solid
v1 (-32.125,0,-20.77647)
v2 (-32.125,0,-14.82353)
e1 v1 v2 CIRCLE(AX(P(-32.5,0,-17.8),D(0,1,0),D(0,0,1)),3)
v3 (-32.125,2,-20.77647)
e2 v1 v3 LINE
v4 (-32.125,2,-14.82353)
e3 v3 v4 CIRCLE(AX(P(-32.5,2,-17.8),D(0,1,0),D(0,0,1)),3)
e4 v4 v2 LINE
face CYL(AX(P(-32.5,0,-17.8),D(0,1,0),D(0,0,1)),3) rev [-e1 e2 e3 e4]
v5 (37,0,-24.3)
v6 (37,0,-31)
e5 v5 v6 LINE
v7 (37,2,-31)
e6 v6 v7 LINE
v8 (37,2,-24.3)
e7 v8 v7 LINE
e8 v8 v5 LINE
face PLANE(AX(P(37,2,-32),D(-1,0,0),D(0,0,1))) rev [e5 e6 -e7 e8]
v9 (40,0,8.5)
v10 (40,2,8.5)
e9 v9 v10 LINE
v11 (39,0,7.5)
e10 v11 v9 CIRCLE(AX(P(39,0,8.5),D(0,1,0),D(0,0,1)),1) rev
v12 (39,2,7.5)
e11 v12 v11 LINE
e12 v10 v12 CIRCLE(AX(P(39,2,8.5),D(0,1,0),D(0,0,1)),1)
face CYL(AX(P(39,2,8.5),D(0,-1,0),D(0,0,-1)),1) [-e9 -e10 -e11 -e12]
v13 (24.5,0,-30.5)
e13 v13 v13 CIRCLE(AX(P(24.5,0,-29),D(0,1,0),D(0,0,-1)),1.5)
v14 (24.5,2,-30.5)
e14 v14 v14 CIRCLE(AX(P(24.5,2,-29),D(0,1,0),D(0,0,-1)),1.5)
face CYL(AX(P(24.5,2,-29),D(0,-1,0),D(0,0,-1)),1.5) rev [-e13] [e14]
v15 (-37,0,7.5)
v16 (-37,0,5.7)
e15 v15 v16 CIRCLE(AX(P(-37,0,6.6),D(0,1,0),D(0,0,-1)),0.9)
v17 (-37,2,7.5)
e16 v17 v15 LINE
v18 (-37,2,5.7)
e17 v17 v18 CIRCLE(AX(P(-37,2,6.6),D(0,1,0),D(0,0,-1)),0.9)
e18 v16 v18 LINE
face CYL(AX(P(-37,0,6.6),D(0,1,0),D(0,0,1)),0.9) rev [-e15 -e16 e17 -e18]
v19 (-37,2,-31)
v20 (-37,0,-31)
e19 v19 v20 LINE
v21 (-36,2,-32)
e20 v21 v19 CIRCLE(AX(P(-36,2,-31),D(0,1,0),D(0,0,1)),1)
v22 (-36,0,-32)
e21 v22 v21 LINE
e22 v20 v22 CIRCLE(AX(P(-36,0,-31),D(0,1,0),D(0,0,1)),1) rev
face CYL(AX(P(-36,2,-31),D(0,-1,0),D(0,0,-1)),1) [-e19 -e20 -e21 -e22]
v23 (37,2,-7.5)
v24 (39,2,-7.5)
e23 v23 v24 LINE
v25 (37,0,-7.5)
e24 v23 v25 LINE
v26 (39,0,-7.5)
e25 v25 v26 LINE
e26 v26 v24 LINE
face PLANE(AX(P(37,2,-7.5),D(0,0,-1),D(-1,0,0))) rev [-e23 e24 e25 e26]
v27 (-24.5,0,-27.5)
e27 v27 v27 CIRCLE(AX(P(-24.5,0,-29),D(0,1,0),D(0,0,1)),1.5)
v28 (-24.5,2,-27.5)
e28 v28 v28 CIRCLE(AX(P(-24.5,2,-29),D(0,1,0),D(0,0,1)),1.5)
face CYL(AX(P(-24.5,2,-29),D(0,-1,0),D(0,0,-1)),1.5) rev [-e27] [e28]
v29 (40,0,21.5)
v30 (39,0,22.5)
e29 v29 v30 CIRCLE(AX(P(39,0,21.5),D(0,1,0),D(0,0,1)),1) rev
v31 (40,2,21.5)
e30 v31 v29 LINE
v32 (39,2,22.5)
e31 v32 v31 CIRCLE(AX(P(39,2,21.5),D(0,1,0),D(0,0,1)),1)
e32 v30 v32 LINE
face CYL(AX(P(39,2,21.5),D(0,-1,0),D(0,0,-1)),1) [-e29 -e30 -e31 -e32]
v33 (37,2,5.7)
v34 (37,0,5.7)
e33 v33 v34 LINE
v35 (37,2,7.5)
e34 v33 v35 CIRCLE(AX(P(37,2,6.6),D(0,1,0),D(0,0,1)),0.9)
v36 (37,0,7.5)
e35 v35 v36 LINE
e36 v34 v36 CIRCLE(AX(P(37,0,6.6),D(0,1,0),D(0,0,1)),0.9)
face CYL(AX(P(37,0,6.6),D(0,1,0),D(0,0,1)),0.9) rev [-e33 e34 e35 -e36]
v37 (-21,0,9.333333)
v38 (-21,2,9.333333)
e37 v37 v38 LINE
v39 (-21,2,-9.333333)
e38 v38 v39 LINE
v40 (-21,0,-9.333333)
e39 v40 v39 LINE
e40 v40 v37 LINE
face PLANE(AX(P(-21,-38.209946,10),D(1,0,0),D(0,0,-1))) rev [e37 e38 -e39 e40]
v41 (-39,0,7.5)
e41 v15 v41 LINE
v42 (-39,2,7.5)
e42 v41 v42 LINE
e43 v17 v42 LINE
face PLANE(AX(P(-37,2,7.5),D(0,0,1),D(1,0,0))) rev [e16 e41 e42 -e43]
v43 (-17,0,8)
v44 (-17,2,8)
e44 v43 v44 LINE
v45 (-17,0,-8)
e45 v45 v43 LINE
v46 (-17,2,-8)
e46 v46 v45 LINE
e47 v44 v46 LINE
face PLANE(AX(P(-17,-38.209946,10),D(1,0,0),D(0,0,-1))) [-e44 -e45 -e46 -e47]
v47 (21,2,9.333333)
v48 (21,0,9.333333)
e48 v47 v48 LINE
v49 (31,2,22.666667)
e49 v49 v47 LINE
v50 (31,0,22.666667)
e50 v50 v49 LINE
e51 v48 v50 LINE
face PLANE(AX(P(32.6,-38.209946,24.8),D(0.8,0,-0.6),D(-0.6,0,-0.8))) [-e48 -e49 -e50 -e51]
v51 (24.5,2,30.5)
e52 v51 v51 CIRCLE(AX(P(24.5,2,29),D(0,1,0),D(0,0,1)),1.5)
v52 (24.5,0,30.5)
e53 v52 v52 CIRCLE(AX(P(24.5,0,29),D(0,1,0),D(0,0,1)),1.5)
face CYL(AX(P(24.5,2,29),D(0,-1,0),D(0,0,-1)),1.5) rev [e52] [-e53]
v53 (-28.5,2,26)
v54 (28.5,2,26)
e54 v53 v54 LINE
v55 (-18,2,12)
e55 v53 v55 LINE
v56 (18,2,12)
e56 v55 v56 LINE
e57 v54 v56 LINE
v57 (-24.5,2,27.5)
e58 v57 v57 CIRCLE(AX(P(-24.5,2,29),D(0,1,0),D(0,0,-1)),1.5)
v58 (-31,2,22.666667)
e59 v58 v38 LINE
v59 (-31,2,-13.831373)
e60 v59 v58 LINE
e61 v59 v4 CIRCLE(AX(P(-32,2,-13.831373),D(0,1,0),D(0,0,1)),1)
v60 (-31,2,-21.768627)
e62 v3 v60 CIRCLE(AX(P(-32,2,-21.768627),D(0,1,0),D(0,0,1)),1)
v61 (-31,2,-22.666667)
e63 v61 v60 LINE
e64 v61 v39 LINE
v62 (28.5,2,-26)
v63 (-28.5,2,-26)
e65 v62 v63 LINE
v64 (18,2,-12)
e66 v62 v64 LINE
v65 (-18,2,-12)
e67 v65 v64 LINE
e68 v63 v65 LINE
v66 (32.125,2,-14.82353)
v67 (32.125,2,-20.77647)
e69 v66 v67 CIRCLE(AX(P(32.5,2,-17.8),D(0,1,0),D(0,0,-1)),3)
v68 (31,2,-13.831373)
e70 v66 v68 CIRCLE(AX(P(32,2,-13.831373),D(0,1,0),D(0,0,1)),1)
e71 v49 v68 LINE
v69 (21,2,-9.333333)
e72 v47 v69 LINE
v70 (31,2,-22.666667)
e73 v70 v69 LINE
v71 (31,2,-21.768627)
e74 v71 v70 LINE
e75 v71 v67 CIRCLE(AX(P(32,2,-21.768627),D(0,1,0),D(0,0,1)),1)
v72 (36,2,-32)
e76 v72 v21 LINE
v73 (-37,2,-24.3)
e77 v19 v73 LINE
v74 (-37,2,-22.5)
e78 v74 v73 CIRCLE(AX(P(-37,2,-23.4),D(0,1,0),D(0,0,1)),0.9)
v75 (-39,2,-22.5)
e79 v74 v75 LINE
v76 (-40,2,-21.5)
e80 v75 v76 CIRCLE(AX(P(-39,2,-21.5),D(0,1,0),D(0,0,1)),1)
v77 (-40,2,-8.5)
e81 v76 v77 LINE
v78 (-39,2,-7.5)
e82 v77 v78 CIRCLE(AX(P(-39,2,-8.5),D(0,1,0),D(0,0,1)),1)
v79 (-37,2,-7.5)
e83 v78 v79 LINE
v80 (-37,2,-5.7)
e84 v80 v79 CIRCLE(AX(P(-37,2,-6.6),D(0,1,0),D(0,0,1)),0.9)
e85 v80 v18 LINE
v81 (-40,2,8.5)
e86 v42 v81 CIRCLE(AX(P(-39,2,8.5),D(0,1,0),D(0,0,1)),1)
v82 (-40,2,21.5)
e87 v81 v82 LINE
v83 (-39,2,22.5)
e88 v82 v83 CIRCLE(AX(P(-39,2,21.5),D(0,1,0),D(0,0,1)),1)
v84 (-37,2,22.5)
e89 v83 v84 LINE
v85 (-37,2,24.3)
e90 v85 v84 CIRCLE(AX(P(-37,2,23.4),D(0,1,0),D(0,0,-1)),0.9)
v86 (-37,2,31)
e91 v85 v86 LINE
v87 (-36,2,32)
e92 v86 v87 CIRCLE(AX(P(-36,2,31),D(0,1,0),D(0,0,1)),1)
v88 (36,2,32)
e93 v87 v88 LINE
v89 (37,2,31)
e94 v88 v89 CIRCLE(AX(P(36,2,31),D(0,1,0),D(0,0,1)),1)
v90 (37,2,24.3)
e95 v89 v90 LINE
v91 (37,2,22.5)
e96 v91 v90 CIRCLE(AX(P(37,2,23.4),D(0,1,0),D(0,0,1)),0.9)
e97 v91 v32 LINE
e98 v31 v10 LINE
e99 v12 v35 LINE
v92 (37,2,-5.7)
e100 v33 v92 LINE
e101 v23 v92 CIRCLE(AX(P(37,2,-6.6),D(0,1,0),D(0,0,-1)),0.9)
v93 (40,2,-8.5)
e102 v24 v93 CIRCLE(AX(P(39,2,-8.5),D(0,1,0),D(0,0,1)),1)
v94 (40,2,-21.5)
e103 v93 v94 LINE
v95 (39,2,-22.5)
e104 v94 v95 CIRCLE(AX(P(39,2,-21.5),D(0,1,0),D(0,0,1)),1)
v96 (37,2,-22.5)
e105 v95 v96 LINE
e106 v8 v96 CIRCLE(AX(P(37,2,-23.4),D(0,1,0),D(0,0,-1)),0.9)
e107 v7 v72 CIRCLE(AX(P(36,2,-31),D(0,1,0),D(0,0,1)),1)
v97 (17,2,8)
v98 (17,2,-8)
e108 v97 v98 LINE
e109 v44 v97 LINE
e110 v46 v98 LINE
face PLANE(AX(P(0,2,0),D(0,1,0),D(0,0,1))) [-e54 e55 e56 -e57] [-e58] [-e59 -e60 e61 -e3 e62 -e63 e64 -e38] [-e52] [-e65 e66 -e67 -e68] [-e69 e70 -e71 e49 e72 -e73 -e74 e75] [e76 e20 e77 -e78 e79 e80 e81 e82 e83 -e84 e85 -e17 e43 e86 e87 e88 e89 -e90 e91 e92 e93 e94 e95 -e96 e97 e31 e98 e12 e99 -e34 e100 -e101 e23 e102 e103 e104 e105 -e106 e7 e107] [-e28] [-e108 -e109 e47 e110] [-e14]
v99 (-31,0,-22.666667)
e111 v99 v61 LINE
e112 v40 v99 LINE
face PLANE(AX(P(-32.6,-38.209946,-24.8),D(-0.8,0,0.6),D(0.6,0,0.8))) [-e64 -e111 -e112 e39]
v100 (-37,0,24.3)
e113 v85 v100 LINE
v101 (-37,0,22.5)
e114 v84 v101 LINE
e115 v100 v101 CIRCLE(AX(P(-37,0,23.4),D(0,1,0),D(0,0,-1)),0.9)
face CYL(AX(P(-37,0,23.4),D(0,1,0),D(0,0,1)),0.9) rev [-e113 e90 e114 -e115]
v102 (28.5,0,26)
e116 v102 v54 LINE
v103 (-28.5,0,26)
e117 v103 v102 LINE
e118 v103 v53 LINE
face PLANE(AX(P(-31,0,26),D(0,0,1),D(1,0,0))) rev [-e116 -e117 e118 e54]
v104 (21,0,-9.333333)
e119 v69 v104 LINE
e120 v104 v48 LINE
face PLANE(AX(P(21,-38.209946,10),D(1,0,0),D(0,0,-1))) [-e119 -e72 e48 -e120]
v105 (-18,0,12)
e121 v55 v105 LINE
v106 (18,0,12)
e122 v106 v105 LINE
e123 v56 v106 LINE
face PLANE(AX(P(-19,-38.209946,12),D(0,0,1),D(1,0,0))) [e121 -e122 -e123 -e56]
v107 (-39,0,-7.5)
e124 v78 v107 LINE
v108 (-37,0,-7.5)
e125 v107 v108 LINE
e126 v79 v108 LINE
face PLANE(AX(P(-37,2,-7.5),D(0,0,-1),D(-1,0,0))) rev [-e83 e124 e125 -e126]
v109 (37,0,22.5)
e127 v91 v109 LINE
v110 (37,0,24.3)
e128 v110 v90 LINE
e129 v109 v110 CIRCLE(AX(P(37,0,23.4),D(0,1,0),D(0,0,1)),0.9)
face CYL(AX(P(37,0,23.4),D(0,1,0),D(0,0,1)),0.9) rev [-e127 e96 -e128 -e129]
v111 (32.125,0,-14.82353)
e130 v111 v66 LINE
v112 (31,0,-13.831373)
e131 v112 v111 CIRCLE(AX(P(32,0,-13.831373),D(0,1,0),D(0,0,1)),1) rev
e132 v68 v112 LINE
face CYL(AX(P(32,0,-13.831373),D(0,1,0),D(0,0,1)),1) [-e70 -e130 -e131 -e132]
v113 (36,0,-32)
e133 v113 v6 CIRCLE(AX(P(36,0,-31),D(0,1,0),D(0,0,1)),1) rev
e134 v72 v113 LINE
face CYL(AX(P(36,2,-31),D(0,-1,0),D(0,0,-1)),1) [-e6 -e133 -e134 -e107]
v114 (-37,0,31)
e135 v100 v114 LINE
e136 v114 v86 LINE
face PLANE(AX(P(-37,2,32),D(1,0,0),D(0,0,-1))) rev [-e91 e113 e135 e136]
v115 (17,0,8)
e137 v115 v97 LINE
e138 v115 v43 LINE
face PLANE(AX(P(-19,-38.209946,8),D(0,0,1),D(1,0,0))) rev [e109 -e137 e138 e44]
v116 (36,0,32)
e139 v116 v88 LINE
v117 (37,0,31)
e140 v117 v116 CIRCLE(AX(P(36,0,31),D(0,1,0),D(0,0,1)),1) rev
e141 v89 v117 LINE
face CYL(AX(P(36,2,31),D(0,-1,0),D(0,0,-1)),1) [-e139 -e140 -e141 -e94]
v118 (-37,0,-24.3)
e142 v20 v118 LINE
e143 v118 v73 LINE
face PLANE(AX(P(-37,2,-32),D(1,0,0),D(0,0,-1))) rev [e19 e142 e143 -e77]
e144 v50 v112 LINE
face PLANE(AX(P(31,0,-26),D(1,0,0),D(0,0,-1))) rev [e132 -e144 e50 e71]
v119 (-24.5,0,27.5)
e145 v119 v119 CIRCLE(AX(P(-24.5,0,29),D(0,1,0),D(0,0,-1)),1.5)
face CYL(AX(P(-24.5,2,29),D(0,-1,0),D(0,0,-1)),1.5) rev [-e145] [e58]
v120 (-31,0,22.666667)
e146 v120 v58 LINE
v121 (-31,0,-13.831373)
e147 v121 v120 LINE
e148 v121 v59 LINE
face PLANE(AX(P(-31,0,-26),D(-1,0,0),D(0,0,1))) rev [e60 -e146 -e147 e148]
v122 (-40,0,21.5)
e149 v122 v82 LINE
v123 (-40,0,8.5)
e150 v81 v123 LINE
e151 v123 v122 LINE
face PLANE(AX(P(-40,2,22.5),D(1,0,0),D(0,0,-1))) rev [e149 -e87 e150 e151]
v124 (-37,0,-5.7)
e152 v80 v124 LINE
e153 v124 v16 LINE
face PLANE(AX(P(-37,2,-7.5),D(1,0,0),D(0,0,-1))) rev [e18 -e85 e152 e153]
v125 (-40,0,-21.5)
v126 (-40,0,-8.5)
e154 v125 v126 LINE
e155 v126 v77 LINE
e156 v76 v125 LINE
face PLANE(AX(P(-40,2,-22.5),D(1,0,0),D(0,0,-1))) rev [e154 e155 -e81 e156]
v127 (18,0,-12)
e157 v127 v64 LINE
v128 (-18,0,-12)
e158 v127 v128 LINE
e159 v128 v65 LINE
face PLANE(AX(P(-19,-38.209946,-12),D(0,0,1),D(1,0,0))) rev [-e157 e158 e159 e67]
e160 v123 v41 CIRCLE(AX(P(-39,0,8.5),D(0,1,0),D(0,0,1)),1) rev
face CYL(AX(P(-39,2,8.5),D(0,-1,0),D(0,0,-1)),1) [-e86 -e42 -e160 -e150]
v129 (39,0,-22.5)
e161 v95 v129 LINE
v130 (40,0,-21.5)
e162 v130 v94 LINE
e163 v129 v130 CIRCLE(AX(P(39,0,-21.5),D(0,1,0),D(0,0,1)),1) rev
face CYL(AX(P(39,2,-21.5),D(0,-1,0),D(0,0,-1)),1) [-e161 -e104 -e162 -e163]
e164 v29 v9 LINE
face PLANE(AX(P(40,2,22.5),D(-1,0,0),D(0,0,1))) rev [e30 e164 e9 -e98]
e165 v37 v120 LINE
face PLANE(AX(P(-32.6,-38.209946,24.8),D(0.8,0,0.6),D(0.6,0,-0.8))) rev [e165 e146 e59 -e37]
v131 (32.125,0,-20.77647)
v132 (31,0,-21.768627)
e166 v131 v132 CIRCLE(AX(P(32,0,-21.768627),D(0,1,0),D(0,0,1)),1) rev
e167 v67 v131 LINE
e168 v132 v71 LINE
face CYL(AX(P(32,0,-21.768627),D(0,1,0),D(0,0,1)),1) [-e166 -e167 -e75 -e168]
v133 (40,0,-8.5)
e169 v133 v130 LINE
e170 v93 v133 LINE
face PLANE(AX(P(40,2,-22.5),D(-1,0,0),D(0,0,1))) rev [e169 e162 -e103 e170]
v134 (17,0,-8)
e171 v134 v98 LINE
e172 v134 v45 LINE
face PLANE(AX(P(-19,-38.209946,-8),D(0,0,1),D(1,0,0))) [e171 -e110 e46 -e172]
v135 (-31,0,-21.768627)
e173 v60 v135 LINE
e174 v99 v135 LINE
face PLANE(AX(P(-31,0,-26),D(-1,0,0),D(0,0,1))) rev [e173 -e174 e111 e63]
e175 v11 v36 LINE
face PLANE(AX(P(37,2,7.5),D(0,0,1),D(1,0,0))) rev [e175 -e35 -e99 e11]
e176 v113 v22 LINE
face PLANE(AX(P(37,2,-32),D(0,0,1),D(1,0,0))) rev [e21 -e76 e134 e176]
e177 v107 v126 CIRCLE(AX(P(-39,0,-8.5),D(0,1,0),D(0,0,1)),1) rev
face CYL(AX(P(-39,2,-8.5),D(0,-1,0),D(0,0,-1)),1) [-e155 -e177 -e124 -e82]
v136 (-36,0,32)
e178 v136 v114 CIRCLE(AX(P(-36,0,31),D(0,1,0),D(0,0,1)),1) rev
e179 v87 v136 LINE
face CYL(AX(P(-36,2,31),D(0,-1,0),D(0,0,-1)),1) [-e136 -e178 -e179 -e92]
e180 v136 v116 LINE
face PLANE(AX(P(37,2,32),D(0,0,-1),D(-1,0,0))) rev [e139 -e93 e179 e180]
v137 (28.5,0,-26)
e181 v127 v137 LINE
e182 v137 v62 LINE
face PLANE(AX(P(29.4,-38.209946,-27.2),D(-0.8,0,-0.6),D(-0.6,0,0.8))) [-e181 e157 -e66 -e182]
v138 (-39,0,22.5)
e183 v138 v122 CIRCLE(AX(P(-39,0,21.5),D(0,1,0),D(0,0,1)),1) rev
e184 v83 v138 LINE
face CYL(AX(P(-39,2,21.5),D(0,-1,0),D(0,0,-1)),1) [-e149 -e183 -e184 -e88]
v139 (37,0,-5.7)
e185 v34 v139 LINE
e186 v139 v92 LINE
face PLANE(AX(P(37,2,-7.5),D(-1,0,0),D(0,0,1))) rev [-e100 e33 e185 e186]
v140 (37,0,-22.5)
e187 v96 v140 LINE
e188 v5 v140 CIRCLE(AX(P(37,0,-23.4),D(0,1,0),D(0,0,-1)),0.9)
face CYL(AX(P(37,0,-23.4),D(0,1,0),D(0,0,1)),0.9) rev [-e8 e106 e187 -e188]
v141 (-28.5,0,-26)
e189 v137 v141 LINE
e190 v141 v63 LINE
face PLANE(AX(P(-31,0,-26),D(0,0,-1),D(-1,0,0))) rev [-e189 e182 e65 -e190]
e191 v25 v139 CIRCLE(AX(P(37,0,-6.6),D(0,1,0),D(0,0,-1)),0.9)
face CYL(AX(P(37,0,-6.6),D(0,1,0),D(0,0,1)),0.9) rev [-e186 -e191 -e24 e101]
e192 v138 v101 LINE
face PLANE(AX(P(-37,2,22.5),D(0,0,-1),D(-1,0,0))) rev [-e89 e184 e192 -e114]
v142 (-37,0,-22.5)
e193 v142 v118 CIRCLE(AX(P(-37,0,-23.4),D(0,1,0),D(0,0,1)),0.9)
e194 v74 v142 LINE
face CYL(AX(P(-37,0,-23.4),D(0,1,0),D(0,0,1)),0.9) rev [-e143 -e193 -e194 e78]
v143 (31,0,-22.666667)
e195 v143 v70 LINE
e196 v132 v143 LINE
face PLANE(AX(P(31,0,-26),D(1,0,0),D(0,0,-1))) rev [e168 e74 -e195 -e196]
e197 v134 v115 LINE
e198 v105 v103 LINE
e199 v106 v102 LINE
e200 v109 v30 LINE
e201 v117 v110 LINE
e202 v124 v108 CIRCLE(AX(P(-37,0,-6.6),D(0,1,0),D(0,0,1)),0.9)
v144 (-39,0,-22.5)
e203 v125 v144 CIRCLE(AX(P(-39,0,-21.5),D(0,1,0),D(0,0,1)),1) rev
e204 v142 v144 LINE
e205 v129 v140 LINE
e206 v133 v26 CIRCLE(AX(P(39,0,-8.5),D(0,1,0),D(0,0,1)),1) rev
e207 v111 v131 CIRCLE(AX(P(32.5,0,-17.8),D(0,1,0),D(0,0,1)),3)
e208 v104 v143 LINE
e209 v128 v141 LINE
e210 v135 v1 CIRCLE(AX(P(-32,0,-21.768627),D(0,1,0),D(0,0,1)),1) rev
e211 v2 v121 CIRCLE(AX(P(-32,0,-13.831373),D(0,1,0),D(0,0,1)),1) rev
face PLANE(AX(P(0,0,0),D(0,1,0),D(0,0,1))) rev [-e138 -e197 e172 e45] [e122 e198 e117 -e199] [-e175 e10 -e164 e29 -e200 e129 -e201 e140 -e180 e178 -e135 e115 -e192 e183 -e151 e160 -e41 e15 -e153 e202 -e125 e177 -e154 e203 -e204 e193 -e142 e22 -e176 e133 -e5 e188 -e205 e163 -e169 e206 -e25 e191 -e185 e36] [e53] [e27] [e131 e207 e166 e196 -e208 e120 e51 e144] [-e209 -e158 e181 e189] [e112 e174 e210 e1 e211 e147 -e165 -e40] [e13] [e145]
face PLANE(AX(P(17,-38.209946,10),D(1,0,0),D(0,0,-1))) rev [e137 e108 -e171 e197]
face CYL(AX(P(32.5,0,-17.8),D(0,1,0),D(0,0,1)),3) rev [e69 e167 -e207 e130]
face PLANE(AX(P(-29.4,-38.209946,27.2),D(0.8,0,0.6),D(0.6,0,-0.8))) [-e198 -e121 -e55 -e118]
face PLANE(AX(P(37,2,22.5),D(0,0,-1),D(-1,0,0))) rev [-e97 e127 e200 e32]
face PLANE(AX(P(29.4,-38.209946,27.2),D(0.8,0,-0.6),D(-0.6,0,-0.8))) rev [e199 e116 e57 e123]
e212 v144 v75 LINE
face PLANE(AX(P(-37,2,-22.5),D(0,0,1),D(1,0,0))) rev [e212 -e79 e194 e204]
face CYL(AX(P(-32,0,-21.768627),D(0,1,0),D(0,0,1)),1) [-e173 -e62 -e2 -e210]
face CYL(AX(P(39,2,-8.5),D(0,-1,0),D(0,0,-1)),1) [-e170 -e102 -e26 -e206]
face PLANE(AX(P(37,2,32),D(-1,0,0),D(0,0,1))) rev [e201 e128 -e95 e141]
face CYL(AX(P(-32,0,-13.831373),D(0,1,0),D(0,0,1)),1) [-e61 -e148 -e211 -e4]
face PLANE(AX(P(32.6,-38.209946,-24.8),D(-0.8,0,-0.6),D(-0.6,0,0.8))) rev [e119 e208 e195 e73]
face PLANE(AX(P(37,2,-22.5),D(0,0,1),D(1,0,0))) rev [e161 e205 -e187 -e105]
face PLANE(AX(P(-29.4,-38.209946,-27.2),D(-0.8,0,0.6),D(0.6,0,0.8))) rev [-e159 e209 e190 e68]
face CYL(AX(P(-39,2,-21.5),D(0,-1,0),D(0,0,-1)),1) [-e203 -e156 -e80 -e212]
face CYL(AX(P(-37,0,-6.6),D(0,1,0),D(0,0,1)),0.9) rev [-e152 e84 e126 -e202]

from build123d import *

# Parameters (mm, degrees)
SKETCH_1_R            = 1.5
EXTRUDE_1_DEPTH       = 2
SKETCH_2_R            = 0.9
SKETCH_2_W            = 62
SKETCH_2_H            = 52
CUT_EXTRUDE_1_DEPTH   = 52.264022472
EXTRUDE_START         = -2
EXTRUDE_1_2_OUTLINE_W = 34
EXTRUDE_1_2_OUTLINE_H = 16
EXTRUDE_1_2_DEPTH     = 2
SKETCH_4_R            = 3
CUT_EXTRUDE_2_DEPTH   = 52.264022472
FILLET_1_R            = 1


# Read off the part's stored shape, not the designer's step: 拉伸-薄壁1
with BuildPart() as part:
    # 草图1 → Extrude 1 (new body)
    with BuildSketch(Plane(origin=(0, 0, 0), x_dir=(1, 0, 0), z_dir=(0, 1, 0))):
        Polygon((-37, 32), (-37, 22.5), (-40, 22.5), (-40, 7.5), (-37, 7.5), (-37, -7.5), (-40, -7.5), (-40, -22.5), (-37, -22.5), (-37, -32), (37, -32), (37, -22.5), (40, -22.5), (40, -7.5), (37, -7.5), (37, 7.5), (40, 7.5), (40, 22.5), (37, 22.5), (37, 32), align=None)
        with Locations(Location((-24.5, 29, 0), (0, 0, 270))):
            Circle(SKETCH_1_R, mode=Mode.SUBTRACT)
        with Locations(Location((24.5, 29, 0), (0, 0, 90))):
            Circle(SKETCH_1_R, mode=Mode.SUBTRACT)
        with Locations(Location((24.5, -29, 0), (0, 0, 270))):
            Circle(SKETCH_1_R, mode=Mode.SUBTRACT)
        with Locations(Location((-24.5, -29, 0), (0, 0, 90))):
            Circle(SKETCH_1_R, mode=Mode.SUBTRACT)
    extrude(amount=EXTRUDE_1_DEPTH)

    # 草图2 → 切除-拉伸1 (cut, through all)
    with BuildSketch(Plane(origin=(0, 2, 0), x_dir=(1, 0, 0), z_dir=(0, 1, 0))):
        with Locations((-37, 23.4)):
            Circle(SKETCH_2_R)
        with Locations((-37, 6.6)):
            Circle(SKETCH_2_R)
        with Locations((37, 6.6)):
            Circle(SKETCH_2_R)
        with Locations((37, 23.4)):
            Circle(SKETCH_2_R)
        with Locations((37, -23.4)):
            Circle(SKETCH_2_R)
        with Locations((-37, -23.4)):
            Circle(SKETCH_2_R)
        with Locations((37, -6.6)):
            Circle(SKETCH_2_R)
        with Locations((-37, -6.6)):
            Circle(SKETCH_2_R)
        Rectangle(SKETCH_2_W, SKETCH_2_H)
    extrude(amount=-CUT_EXTRUDE_1_DEPTH, mode=Mode.SUBTRACT)

    # Extrude 1 2 outline → Extrude 1 2 (add)
    with BuildSketch(Plane(origin=(0, 2, 0), x_dir=(1, 0, 0), z_dir=(0, 1, 0)).offset(EXTRUDE_START)):
        Polygon((-31, 26), (-31, 22.666666667), (-21, 9.333333333), (-21, -9.333333333), (-31, -22.666666667), (-31, -26), (-28.5, -26), (-18, -12), (18, -12), (28.5, -26), (31, -26), (31, -22.666666667), (21, -9.333333333), (21, 9.333333333), (31, 22.666666667), (31, 26), (28.5, 26), (18, 12), (-18, 12), (-28.5, 26), align=None)
        Rectangle(EXTRUDE_1_2_OUTLINE_W, EXTRUDE_1_2_OUTLINE_H, mode=Mode.SUBTRACT)
    extrude(amount=EXTRUDE_1_2_DEPTH)

    # 草图4 → 切除-拉伸2 (cut, through all)
    with BuildSketch(Plane(origin=(0, 2, 0), x_dir=(1, 0, 0), z_dir=(0, 1, 0))):
        with Locations((-32.5, 17.8)):
            Circle(SKETCH_4_R)
        with Locations((32.5, 17.8)):
            Circle(SKETCH_4_R)
    extrude(amount=-CUT_EXTRUDE_2_DEPTH, mode=Mode.SUBTRACT)

    # 圆角1
    fillet_1_edges = [part.edges().sort_by_distance(p)[0] for p in [
        (-31, 1, -15.201923789),
        (-31, 1, -20.398076211),
        (31, 1, -20.398076211),
        (31, 1, -15.201923789),
        (37, 1, -32),
        (40, 1, -22.5),
        (40, 1, -7.5),
        (40, 1, 7.5),
        (40, 1, 22.5),
        (37, 1, 32),
        (-37, 1, 32),
        (-40, 1, 22.5),
        (-40, 1, 7.5),
        (-40, 1, -7.5),
        (-40, 1, -22.5),
        (-37, 1, -32),
    ]]
    fillet(fillet_1_edges, radius=FILLET_1_R)


solid = part.part
